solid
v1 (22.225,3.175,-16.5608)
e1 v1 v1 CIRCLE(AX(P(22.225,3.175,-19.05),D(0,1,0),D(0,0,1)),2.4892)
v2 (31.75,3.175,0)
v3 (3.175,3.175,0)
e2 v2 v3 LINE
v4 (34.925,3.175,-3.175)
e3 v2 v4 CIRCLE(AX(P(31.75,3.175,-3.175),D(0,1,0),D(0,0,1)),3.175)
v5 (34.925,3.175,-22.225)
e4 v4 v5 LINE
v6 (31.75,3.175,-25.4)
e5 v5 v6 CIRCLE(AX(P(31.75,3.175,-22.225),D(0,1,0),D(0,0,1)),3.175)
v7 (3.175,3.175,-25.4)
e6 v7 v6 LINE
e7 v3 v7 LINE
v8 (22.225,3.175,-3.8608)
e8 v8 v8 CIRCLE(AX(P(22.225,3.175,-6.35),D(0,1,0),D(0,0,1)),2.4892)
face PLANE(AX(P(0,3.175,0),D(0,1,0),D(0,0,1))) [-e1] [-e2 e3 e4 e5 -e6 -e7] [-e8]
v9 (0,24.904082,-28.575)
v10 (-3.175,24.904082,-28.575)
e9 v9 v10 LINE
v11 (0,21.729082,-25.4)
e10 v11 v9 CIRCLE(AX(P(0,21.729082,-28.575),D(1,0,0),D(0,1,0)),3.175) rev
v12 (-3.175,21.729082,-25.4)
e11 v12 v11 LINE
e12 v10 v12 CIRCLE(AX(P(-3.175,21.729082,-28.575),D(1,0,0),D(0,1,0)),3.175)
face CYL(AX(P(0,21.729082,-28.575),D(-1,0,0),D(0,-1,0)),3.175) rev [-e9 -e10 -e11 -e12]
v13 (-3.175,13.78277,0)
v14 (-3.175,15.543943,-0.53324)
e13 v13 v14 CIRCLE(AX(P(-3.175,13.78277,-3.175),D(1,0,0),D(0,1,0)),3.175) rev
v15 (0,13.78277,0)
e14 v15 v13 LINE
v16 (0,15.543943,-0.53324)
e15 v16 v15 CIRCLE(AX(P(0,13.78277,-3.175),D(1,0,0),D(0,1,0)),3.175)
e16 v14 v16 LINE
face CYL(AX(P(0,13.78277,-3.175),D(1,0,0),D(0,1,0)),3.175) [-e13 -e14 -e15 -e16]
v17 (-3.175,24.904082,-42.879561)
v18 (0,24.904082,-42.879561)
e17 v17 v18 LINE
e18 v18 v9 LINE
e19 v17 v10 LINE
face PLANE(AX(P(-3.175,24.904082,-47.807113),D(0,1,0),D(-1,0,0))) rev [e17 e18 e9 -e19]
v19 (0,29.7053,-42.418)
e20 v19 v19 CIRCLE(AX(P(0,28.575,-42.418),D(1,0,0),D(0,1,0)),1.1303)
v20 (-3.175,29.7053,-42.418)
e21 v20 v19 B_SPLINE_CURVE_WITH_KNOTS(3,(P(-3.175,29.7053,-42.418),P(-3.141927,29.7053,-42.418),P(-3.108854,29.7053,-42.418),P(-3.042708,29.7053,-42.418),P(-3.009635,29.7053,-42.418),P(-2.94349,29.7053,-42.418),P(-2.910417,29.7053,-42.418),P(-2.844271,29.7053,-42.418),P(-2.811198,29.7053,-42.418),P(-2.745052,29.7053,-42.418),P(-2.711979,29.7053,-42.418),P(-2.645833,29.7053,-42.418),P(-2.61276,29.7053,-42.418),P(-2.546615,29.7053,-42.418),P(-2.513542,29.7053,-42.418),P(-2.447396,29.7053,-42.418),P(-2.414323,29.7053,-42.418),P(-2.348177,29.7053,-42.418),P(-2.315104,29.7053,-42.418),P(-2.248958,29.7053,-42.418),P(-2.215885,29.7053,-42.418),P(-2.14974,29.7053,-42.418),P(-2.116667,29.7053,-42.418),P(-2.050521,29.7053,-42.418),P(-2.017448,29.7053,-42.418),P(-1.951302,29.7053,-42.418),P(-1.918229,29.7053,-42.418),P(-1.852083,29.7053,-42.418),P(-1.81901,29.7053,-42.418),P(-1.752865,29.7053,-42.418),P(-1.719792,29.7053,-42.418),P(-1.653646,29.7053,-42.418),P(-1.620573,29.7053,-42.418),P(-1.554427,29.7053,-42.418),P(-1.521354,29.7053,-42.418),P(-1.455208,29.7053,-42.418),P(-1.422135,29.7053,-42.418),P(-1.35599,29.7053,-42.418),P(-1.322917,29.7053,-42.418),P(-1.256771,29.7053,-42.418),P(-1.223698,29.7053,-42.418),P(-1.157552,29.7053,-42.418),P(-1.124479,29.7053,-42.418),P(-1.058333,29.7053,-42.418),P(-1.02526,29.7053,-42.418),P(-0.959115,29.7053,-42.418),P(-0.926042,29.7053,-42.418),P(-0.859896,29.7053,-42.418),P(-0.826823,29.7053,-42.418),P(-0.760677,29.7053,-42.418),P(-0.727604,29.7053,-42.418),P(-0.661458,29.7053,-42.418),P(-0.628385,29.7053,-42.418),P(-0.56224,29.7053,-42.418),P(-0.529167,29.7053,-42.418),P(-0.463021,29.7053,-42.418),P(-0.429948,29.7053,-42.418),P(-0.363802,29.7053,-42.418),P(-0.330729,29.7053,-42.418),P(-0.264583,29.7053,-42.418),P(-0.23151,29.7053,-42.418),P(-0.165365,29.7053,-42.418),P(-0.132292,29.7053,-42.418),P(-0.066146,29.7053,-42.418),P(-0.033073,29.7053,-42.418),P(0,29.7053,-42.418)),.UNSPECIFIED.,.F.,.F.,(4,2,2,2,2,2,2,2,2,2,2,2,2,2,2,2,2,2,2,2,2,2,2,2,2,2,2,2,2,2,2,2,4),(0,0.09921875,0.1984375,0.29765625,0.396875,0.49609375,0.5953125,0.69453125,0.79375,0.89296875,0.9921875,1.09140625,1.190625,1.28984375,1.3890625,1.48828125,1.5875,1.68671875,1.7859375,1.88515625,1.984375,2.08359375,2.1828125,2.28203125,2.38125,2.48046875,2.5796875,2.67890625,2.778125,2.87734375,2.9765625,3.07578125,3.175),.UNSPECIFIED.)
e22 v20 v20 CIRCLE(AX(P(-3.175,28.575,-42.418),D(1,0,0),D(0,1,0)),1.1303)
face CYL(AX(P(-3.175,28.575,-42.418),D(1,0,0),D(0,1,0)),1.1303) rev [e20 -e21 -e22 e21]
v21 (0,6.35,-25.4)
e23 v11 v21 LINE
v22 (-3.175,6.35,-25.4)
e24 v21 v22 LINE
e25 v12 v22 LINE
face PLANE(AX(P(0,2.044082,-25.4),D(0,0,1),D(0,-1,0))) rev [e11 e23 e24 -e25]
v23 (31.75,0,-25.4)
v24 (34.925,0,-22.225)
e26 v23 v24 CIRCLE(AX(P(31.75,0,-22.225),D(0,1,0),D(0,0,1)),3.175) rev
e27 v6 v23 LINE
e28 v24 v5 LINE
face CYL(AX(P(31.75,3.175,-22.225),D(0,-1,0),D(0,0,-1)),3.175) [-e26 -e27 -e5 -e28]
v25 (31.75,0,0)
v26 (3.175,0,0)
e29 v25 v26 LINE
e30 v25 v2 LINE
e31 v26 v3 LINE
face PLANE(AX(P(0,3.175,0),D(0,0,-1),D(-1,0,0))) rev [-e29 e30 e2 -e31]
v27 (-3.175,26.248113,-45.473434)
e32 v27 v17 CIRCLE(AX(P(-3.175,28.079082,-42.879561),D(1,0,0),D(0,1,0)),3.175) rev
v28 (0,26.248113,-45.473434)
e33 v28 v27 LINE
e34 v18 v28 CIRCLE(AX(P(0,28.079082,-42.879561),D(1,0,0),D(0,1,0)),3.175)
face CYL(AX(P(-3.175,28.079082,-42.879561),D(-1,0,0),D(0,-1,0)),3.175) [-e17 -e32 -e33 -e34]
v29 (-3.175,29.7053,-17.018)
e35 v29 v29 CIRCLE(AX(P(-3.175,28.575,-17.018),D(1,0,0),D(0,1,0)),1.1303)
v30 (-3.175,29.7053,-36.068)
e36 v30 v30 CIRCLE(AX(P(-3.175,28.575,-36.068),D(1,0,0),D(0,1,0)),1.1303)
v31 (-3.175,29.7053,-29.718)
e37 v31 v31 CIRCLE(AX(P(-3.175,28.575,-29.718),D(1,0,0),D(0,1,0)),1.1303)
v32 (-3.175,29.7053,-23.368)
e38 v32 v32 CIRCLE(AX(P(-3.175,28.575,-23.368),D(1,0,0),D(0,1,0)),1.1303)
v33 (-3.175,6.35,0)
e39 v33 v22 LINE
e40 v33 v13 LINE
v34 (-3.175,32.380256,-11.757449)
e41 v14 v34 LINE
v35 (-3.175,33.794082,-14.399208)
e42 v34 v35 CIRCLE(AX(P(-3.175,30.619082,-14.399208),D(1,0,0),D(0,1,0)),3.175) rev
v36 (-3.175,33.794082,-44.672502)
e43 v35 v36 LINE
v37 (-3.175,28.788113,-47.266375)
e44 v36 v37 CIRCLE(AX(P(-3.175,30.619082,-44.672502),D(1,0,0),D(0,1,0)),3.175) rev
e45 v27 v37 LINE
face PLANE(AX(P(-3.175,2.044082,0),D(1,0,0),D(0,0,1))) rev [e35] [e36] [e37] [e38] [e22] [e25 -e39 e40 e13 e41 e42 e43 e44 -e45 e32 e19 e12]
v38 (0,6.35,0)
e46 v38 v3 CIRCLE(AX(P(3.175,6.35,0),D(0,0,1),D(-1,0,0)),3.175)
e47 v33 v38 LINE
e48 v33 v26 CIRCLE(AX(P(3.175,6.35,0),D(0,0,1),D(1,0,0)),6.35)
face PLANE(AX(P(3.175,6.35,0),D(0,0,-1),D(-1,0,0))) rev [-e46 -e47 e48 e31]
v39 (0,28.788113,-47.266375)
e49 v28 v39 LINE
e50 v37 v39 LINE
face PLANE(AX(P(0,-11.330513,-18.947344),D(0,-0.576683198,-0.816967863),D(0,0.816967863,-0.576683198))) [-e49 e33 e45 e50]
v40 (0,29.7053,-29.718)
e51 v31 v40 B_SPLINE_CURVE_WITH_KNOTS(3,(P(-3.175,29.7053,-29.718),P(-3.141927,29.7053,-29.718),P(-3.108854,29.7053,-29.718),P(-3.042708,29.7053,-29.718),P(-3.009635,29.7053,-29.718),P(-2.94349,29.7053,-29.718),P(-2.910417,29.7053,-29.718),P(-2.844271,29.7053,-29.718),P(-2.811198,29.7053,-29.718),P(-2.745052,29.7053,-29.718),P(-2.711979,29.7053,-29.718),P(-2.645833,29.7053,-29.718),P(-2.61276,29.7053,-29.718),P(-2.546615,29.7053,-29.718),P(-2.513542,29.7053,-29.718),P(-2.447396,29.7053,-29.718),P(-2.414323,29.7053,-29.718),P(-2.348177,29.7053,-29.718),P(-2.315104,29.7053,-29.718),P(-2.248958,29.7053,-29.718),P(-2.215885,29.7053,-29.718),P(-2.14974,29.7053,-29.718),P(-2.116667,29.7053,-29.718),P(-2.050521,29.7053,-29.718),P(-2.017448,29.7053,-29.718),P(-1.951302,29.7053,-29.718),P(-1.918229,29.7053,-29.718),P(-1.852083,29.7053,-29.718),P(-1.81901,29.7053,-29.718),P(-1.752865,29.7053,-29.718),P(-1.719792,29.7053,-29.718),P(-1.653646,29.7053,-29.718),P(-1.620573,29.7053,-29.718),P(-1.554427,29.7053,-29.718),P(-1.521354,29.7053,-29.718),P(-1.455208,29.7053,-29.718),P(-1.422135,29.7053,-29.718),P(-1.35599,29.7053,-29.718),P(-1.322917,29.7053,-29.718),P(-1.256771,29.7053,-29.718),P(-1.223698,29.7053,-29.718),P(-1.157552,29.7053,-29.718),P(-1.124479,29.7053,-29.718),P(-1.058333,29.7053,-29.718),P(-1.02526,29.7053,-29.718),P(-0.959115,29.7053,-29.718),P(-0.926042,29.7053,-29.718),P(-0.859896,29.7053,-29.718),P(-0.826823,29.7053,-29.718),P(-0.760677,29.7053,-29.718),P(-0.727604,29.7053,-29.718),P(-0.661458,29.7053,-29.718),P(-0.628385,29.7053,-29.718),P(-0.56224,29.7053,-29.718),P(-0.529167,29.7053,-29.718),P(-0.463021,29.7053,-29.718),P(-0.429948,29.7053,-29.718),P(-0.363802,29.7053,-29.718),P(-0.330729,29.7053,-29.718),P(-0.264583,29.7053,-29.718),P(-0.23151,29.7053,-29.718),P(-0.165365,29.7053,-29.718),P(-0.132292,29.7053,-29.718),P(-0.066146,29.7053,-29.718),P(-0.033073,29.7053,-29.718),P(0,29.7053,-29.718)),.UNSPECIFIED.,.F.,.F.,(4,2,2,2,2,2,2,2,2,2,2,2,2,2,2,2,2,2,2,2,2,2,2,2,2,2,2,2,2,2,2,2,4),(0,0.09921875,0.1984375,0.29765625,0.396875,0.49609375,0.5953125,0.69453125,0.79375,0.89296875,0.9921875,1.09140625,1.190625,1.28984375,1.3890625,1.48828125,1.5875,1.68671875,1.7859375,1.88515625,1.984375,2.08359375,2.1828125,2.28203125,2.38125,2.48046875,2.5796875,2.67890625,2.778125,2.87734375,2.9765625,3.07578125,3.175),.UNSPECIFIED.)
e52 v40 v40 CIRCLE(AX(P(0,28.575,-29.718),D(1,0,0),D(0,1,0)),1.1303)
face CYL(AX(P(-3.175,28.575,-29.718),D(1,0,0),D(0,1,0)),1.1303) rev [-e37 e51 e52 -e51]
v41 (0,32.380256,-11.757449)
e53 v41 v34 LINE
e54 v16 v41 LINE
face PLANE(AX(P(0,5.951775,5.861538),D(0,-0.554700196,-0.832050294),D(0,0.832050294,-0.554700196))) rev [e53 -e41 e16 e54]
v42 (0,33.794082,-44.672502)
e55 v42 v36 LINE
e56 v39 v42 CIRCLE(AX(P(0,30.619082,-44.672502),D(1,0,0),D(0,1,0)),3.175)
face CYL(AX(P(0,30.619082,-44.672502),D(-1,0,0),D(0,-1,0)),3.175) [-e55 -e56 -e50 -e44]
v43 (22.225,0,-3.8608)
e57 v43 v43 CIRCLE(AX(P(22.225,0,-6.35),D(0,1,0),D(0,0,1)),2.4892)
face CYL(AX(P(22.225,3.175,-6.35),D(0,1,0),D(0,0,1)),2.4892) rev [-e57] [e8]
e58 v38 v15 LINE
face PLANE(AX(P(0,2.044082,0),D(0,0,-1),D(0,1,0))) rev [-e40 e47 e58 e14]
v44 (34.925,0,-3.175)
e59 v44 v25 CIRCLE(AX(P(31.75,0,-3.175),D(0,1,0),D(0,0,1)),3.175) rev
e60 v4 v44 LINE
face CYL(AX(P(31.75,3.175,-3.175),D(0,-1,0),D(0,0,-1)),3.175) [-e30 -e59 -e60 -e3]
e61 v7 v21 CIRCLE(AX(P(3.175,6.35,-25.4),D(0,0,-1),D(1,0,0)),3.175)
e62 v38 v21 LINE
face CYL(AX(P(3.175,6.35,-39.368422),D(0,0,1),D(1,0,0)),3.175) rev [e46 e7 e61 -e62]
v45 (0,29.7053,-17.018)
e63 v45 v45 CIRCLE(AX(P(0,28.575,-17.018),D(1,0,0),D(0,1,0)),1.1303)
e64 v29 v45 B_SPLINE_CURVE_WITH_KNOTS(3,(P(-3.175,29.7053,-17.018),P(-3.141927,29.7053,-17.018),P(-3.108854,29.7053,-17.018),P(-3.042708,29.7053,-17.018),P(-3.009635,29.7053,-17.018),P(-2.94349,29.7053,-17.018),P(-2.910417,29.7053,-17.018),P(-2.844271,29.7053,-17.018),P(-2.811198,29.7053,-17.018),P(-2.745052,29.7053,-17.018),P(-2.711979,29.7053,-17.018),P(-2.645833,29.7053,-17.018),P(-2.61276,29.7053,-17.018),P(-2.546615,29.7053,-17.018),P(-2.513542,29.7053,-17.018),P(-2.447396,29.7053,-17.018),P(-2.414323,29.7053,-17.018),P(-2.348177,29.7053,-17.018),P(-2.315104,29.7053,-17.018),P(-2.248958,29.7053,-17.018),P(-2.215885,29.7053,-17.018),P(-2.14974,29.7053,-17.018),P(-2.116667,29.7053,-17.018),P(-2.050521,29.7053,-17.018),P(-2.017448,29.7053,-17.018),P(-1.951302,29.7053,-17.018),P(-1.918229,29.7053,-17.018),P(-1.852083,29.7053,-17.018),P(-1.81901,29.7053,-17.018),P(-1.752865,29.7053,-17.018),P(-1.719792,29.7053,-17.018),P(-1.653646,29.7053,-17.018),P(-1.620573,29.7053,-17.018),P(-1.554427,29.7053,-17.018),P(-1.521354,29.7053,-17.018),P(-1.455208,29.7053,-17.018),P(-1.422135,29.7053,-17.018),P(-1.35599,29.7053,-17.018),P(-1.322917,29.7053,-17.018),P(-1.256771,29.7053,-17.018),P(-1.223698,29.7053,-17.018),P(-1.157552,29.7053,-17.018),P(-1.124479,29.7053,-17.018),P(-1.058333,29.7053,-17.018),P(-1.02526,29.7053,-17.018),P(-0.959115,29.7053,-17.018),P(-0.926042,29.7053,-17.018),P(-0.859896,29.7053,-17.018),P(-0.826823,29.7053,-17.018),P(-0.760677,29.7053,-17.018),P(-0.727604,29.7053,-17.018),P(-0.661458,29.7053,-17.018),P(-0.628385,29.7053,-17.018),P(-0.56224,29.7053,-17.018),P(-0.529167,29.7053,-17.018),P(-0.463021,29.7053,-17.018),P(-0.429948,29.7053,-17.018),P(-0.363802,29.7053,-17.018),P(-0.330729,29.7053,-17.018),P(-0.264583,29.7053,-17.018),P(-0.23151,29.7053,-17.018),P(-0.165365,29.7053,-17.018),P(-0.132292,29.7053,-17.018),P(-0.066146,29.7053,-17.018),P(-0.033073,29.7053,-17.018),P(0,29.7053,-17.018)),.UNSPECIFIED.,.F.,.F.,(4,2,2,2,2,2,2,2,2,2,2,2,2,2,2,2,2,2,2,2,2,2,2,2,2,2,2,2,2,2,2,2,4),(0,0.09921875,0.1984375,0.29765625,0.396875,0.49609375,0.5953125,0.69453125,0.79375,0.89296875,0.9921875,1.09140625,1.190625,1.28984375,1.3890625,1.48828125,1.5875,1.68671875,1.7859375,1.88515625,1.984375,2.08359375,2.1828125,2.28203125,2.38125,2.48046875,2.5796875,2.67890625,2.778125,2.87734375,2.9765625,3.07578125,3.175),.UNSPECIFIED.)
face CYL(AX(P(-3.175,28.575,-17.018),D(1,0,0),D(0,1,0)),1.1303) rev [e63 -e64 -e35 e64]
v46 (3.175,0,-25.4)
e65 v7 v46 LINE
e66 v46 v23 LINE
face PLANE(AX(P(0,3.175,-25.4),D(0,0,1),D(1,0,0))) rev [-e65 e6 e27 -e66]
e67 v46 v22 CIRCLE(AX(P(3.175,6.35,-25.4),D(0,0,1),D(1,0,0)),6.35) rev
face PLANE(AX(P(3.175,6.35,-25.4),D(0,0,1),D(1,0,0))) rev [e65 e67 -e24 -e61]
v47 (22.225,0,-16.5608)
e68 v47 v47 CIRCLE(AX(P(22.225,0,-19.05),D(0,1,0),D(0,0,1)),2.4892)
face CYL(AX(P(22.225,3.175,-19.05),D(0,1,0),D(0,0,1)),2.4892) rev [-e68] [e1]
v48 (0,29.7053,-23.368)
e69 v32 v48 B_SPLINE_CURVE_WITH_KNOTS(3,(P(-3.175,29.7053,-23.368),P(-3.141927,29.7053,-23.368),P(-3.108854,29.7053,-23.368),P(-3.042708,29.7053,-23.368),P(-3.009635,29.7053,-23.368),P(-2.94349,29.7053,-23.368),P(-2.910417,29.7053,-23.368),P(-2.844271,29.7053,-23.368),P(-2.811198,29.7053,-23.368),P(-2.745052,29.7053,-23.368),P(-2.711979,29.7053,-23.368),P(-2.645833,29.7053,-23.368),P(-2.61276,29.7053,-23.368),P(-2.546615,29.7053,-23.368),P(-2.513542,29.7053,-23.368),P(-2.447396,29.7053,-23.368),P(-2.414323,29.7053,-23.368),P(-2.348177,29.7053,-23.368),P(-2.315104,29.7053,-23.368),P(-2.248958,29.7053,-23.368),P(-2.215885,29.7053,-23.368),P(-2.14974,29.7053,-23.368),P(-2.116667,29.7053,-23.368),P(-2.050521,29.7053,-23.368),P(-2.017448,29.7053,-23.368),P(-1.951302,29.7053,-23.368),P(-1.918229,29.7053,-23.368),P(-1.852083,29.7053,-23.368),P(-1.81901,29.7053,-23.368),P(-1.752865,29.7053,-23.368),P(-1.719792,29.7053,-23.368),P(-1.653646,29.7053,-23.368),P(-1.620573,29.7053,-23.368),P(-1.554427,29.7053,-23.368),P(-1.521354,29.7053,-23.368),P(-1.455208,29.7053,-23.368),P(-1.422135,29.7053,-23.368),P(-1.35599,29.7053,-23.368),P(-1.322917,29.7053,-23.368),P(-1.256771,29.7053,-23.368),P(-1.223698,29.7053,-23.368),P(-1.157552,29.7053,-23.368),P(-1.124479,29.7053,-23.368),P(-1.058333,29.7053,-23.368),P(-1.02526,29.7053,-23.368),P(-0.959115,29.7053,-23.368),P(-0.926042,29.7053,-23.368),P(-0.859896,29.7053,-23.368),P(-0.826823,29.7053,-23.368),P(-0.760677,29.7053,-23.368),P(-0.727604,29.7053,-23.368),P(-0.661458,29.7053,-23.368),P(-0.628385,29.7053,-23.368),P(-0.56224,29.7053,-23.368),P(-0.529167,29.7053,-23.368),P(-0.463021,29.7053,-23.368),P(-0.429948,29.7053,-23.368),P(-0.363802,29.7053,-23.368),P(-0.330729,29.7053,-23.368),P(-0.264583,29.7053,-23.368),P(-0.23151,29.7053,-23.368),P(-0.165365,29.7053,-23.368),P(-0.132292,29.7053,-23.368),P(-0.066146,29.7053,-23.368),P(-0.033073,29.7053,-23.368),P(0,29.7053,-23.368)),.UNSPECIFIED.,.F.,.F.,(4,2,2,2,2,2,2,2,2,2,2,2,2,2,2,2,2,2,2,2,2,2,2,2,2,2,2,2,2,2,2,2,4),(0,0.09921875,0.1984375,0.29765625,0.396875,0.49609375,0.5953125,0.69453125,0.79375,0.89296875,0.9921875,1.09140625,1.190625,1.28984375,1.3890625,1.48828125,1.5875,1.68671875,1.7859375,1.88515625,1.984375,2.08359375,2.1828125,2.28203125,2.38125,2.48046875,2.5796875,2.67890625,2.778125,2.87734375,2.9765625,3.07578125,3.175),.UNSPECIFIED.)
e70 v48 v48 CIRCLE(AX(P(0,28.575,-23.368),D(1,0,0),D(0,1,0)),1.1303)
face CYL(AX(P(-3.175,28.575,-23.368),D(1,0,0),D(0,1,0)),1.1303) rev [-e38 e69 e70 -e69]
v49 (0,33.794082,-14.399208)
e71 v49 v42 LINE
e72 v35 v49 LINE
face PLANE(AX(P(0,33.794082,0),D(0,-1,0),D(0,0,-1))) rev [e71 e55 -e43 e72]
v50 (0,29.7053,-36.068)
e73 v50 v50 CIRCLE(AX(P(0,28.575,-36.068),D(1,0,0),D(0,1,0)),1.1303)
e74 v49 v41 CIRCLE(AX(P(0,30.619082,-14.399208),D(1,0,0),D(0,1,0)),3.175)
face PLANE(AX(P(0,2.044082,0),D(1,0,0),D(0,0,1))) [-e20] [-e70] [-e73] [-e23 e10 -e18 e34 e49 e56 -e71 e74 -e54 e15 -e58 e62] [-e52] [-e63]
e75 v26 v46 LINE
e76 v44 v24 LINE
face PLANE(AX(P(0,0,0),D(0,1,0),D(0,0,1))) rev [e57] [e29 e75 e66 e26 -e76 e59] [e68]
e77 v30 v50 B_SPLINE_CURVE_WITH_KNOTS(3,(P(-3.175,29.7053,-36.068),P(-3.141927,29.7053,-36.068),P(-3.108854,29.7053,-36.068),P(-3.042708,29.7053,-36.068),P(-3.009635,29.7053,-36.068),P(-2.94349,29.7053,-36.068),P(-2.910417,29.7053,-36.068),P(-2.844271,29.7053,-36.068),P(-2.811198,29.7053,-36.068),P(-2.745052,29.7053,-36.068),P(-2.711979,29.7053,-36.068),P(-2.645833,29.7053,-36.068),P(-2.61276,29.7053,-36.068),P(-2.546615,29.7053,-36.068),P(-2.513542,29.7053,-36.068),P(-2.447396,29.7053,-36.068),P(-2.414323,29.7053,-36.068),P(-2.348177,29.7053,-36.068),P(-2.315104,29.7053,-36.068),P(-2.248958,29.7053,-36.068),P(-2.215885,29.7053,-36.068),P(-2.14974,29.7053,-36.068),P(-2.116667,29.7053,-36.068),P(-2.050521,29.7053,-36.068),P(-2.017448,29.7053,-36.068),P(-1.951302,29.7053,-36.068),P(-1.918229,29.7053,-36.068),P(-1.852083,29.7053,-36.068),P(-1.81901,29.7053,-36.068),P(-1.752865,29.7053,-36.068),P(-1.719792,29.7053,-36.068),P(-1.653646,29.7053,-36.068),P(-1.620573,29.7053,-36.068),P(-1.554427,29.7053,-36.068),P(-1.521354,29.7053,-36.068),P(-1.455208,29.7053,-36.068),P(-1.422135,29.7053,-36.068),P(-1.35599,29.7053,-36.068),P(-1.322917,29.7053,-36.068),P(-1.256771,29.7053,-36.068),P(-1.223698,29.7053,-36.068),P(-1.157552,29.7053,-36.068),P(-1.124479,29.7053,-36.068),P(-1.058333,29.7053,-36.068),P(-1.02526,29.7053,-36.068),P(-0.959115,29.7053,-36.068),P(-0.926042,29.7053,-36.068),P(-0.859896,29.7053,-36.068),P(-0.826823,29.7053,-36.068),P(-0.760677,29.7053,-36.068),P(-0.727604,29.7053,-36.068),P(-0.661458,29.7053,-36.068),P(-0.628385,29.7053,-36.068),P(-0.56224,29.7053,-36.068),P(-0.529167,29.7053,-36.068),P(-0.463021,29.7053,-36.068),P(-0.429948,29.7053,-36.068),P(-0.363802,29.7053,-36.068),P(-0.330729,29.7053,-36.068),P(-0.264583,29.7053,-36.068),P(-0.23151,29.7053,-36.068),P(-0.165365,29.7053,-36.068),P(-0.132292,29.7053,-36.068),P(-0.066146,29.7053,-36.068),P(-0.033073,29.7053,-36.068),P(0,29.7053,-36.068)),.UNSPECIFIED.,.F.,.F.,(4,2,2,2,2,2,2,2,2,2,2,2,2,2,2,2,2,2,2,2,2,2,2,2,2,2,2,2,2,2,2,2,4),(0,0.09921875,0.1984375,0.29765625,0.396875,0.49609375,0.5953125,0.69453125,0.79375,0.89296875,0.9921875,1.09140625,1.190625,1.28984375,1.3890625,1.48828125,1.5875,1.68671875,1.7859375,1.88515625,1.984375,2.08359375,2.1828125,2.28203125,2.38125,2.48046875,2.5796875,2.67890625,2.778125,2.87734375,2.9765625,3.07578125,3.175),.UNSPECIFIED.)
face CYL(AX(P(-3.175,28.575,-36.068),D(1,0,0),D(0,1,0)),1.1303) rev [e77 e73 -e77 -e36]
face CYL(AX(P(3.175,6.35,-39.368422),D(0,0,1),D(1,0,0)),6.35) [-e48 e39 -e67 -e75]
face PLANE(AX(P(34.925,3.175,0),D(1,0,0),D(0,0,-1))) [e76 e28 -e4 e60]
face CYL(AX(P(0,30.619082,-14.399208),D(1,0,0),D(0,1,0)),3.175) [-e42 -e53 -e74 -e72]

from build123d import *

# Parameters (mm, degrees)
SKETCH1_R                  = 2.4892
BOSS_EXTRUDE1_DEPTH        = 3.175
SKETCHED_START             = -52
SKETCHED_BEND2_DEPTH       = 52
SKETCHED_START_2           = -25.4
SKETCHED_BEND2_2_DEPTH     = 12.7
SKETCHED_START_3           = -41.835294118
SKETCHED_BEND2_3_OUTLINE_W = 3.175
SKETCHED_BEND2_3_OUTLINE_H = 12.7
SKETCHED_BEND2_3_DEPTH     = 16.435294118
SKETCHED_BEND2_4_DEPTH     = 20.459192
SKETCHED_START_4           = -50.8
SKETCHED_BEND2_5_OUTLINE_W = 3.175
SKETCHED_BEND2_5_OUTLINE_H = 12.7
SKETCHED_BEND2_5_DEPTH     = 48.117252
SKETCHED_START_5           = -4.940808
SKETCHED_BEND2_6_DEPTH     = 4.940808
SKETCHED_START_6           = -3.175
SKETCHED_BEND2_7_DEPTH     = 3.175
SKETCH13_R                 = 1.1303
CUT_EXTRUDE2_DEPTH         = 71.302458254
FILLET1_R                  = 3.175
SKETCH14_W                 = 22.407113123
SKETCH14_H                 = 6.985
CUT_EXTRUDE3_DEPTH         = 69.199553227
FILLET2_R                  = 3.175


with BuildPart() as part:
    # Sketch1 → Boss-Extrude1 (new body)
    # profile 1 of 2: a face of its own
    with BuildSketch(Plane(origin=(0, 0, 0), x_dir=(1, 0, 0), z_dir=(0, 1, 0))):
        Polygon((6.35, 0), (25.4, 0), (34.925, 0), (34.925, 25.4), (26.986065751, 25.4), (10.476065751, 25.4), (6.35, 25.4), align=None)
        with Locations(Location((22.225, 6.35, 0), (0, 0, 270))):
            Circle(SKETCH1_R, mode=Mode.SUBTRACT)
        with Locations(Location((22.225, 19.05, 0), (0, 0, 270))):
            Circle(SKETCH1_R, mode=Mode.SUBTRACT)
    # profile 2 of 2: a face of its own
    with BuildSketch(Plane(origin=(0, 0, 0), x_dir=(1, 0, 0), z_dir=(0, 1, 0))):
        Polygon((-12.7, 0), (6.35, 0), (6.35, 25.4), (0, 25.4), (-19.05, 25.4), (-19.05, 41.835294118), (-23.415467049, 44.91680027), (-31.75, 50.8), (-31.75, 12.7), (-23.415467049, 7.143644699), align=None)
    extrude(amount=BOSS_EXTRUDE1_DEPTH)

    # Sketched Bend2: read off the stored shape, not the designer's step
    # Sketched Bend2 outline → Sketched Bend2 (cut)
    with BuildSketch(Plane.XY.offset(SKETCHED_START)):
        with BuildLine():
            ThreePointArc((3.175, 0), (-1e-09, 0.850738686), (-2.324261315, 3.175))
            Line((-2.324261315, 3.175), (-31.75, 3.175))
            Line((-31.75, 3.175), (-31.75, 0))
            Line((-31.75, 0), (3.175, 0))
        make_face()
    extrude(amount=SKETCHED_BEND2_DEPTH, mode=Mode.SUBTRACT)

    # Sketched Bend2 2 outline → Sketched Bend2 2 (add)
    with BuildSketch(Plane.XY.offset(SKETCHED_START_2)):
        with BuildLine():
            ThreePointArc((3.175, 3.175), (0.92993597, 4.10493597), (0, 6.35))
            Line((0, 6.35), (0, 33.794082494))
            Line((0, 33.794082494), (-3.175, 33.794082494))
            Line((-3.175, 33.794082494), (-3.175, 6.35))
            ThreePointArc((-3.175, 6.35), (-2.958628997, 4.706499064), (-2.324261315, 3.175))
            Line((-2.324261315, 3.175), (3.175, 3.175))
        make_face()
    extrude(amount=SKETCHED_BEND2_2_DEPTH)

    # Sketched Bend2 3 outline → Sketched Bend2 3 (add)
    with BuildSketch(Plane.XY.offset(SKETCHED_START_3)):
        with Locations((-1.5875, 27.444082494)):
            Rectangle(SKETCHED_BEND2_3_OUTLINE_W, SKETCHED_BEND2_3_OUTLINE_H)
    extrude(amount=SKETCHED_BEND2_3_DEPTH)

    # Sketched Bend2 4 outline → Sketched Bend2 4 (add)
    with BuildSketch(Plane.XY.offset(SKETCHED_START_2)):
        with BuildLine():
            ThreePointArc((3.175, 3.175), (0.92993597, 4.10493597), (0, 6.35))
            Line((0, 6.35), (0, 21.094082494))
            Line((0, 21.094082494), (-3.175, 21.094082494))
            Line((-3.175, 21.094082494), (-3.175, 6.35))
            ThreePointArc((-3.175, 6.35), (-2.958628997, 4.706499064), (-2.324261315, 3.175))
            Line((-2.324261315, 3.175), (3.175, 3.175))
        make_face()
    extrude(amount=SKETCHED_BEND2_4_DEPTH)

    # Sketched Bend2 5 outline → Sketched Bend2 5 (add)
    with BuildSketch(Plane.XY.offset(SKETCHED_START_4)):
        with Locations((-1.5875, 27.444082494)):
            Rectangle(SKETCHED_BEND2_5_OUTLINE_W, SKETCHED_BEND2_5_OUTLINE_H)
    extrude(amount=SKETCHED_BEND2_5_DEPTH)

    # Sketched Bend2 6 outline → Sketched Bend2 6 (add)
    with BuildSketch(Plane.XY.offset(SKETCHED_START_5)):
        with BuildLine():
            ThreePointArc((3.175, 3.175), (0.92993597, 4.10493597), (0, 6.35))
            Line((0, 6.35), (0, 21.094082494))
            Line((0, 21.094082494), (-3.175, 21.094082494))
            Line((-3.175, 21.094082494), (-3.175, 6.35))
            ThreePointArc((-3.175, 6.35), (-2.958628997, 4.706499064), (-2.324261315, 3.175))
            Line((-2.324261315, 3.175), (3.175, 3.175))
        make_face()
    extrude(amount=SKETCHED_BEND2_6_DEPTH)

    # Sketched Bend2 7 outline → Sketched Bend2 7 (cut)
    with BuildSketch(Plane.YZ.offset(SKETCHED_START_6)):
        Polygon((21.094082494, 0), (14.744082494, 0), (33.794082494, -12.7), (33.794082494, -2.682748), (21.094082494, -2.682748), align=None)
        Polygon((21.094082494, -50.8), (33.794082494, -50.8), (21.094082494, -41.835294118), align=None)
    extrude(amount=SKETCHED_BEND2_7_DEPTH, mode=Mode.SUBTRACT)

    # Sketch13 → Cut-Extrude2 (cut, through all)
    with BuildSketch(Plane(origin=(0, 0, 0), x_dir=(0, 0, -1), z_dir=(1, 0, 0))):
        with Locations(Location((42.418, 28.575, 0), (0, 0, 90))):
            Circle(SKETCH13_R)
        with Locations(Location((36.068, 28.575, 0), (0, 0, 90))):
            Circle(SKETCH13_R)
        with Locations(Location((29.718, 28.575, 0), (0, 0, 90))):
            Circle(SKETCH13_R)
        with Locations(Location((23.368, 28.575, 0), (0, 0, 90))):
            Circle(SKETCH13_R)
        with Locations(Location((17.018, 28.575, 0), (0, 0, 90))):
            Circle(SKETCH13_R)
    extrude(amount=-CUT_EXTRUDE2_DEPTH, mode=Mode.SUBTRACT)

    # Fillet1
    fillet1_edges = [part.edges().sort_by_distance(p)[0] for p in [
        (-1.5875, 21.094082494, -41.835294118),
        (-1.5875, 21.094082494, -25.4),
        (-1.5875, 14.744082494, 0),
        (-1.5875, 33.794082494, -12.7),
        (-1.5875, 33.794082494, -50.8),
        (34.925, 1.5875, -25.4),
        (34.925, 1.5875, 0),
    ]]
    fillet(fillet1_edges, radius=FILLET1_R)

    # Sketch14 → Cut-Extrude3 (cut, through all)
    with BuildSketch(Plane(origin=(0, 0, 0), x_dir=(0, 0, -1), z_dir=(1, 0, 0))):
        with Locations((36.603556561, 21.411582494)):
            Rectangle(SKETCH14_W, SKETCH14_H)
    extrude(amount=-CUT_EXTRUDE3_DEPTH, mode=Mode.SUBTRACT)

    # Fillet2
    fillet2_edges = [part.edges().sort_by_distance(p)[0] for p in [
        (-1.5875, 24.904082494, -44.524705882),
        (-1.5875, 24.904082494, -25.4),
    ]]
    fillet(fillet2_edges, radius=FILLET2_R)


solid = part.part
